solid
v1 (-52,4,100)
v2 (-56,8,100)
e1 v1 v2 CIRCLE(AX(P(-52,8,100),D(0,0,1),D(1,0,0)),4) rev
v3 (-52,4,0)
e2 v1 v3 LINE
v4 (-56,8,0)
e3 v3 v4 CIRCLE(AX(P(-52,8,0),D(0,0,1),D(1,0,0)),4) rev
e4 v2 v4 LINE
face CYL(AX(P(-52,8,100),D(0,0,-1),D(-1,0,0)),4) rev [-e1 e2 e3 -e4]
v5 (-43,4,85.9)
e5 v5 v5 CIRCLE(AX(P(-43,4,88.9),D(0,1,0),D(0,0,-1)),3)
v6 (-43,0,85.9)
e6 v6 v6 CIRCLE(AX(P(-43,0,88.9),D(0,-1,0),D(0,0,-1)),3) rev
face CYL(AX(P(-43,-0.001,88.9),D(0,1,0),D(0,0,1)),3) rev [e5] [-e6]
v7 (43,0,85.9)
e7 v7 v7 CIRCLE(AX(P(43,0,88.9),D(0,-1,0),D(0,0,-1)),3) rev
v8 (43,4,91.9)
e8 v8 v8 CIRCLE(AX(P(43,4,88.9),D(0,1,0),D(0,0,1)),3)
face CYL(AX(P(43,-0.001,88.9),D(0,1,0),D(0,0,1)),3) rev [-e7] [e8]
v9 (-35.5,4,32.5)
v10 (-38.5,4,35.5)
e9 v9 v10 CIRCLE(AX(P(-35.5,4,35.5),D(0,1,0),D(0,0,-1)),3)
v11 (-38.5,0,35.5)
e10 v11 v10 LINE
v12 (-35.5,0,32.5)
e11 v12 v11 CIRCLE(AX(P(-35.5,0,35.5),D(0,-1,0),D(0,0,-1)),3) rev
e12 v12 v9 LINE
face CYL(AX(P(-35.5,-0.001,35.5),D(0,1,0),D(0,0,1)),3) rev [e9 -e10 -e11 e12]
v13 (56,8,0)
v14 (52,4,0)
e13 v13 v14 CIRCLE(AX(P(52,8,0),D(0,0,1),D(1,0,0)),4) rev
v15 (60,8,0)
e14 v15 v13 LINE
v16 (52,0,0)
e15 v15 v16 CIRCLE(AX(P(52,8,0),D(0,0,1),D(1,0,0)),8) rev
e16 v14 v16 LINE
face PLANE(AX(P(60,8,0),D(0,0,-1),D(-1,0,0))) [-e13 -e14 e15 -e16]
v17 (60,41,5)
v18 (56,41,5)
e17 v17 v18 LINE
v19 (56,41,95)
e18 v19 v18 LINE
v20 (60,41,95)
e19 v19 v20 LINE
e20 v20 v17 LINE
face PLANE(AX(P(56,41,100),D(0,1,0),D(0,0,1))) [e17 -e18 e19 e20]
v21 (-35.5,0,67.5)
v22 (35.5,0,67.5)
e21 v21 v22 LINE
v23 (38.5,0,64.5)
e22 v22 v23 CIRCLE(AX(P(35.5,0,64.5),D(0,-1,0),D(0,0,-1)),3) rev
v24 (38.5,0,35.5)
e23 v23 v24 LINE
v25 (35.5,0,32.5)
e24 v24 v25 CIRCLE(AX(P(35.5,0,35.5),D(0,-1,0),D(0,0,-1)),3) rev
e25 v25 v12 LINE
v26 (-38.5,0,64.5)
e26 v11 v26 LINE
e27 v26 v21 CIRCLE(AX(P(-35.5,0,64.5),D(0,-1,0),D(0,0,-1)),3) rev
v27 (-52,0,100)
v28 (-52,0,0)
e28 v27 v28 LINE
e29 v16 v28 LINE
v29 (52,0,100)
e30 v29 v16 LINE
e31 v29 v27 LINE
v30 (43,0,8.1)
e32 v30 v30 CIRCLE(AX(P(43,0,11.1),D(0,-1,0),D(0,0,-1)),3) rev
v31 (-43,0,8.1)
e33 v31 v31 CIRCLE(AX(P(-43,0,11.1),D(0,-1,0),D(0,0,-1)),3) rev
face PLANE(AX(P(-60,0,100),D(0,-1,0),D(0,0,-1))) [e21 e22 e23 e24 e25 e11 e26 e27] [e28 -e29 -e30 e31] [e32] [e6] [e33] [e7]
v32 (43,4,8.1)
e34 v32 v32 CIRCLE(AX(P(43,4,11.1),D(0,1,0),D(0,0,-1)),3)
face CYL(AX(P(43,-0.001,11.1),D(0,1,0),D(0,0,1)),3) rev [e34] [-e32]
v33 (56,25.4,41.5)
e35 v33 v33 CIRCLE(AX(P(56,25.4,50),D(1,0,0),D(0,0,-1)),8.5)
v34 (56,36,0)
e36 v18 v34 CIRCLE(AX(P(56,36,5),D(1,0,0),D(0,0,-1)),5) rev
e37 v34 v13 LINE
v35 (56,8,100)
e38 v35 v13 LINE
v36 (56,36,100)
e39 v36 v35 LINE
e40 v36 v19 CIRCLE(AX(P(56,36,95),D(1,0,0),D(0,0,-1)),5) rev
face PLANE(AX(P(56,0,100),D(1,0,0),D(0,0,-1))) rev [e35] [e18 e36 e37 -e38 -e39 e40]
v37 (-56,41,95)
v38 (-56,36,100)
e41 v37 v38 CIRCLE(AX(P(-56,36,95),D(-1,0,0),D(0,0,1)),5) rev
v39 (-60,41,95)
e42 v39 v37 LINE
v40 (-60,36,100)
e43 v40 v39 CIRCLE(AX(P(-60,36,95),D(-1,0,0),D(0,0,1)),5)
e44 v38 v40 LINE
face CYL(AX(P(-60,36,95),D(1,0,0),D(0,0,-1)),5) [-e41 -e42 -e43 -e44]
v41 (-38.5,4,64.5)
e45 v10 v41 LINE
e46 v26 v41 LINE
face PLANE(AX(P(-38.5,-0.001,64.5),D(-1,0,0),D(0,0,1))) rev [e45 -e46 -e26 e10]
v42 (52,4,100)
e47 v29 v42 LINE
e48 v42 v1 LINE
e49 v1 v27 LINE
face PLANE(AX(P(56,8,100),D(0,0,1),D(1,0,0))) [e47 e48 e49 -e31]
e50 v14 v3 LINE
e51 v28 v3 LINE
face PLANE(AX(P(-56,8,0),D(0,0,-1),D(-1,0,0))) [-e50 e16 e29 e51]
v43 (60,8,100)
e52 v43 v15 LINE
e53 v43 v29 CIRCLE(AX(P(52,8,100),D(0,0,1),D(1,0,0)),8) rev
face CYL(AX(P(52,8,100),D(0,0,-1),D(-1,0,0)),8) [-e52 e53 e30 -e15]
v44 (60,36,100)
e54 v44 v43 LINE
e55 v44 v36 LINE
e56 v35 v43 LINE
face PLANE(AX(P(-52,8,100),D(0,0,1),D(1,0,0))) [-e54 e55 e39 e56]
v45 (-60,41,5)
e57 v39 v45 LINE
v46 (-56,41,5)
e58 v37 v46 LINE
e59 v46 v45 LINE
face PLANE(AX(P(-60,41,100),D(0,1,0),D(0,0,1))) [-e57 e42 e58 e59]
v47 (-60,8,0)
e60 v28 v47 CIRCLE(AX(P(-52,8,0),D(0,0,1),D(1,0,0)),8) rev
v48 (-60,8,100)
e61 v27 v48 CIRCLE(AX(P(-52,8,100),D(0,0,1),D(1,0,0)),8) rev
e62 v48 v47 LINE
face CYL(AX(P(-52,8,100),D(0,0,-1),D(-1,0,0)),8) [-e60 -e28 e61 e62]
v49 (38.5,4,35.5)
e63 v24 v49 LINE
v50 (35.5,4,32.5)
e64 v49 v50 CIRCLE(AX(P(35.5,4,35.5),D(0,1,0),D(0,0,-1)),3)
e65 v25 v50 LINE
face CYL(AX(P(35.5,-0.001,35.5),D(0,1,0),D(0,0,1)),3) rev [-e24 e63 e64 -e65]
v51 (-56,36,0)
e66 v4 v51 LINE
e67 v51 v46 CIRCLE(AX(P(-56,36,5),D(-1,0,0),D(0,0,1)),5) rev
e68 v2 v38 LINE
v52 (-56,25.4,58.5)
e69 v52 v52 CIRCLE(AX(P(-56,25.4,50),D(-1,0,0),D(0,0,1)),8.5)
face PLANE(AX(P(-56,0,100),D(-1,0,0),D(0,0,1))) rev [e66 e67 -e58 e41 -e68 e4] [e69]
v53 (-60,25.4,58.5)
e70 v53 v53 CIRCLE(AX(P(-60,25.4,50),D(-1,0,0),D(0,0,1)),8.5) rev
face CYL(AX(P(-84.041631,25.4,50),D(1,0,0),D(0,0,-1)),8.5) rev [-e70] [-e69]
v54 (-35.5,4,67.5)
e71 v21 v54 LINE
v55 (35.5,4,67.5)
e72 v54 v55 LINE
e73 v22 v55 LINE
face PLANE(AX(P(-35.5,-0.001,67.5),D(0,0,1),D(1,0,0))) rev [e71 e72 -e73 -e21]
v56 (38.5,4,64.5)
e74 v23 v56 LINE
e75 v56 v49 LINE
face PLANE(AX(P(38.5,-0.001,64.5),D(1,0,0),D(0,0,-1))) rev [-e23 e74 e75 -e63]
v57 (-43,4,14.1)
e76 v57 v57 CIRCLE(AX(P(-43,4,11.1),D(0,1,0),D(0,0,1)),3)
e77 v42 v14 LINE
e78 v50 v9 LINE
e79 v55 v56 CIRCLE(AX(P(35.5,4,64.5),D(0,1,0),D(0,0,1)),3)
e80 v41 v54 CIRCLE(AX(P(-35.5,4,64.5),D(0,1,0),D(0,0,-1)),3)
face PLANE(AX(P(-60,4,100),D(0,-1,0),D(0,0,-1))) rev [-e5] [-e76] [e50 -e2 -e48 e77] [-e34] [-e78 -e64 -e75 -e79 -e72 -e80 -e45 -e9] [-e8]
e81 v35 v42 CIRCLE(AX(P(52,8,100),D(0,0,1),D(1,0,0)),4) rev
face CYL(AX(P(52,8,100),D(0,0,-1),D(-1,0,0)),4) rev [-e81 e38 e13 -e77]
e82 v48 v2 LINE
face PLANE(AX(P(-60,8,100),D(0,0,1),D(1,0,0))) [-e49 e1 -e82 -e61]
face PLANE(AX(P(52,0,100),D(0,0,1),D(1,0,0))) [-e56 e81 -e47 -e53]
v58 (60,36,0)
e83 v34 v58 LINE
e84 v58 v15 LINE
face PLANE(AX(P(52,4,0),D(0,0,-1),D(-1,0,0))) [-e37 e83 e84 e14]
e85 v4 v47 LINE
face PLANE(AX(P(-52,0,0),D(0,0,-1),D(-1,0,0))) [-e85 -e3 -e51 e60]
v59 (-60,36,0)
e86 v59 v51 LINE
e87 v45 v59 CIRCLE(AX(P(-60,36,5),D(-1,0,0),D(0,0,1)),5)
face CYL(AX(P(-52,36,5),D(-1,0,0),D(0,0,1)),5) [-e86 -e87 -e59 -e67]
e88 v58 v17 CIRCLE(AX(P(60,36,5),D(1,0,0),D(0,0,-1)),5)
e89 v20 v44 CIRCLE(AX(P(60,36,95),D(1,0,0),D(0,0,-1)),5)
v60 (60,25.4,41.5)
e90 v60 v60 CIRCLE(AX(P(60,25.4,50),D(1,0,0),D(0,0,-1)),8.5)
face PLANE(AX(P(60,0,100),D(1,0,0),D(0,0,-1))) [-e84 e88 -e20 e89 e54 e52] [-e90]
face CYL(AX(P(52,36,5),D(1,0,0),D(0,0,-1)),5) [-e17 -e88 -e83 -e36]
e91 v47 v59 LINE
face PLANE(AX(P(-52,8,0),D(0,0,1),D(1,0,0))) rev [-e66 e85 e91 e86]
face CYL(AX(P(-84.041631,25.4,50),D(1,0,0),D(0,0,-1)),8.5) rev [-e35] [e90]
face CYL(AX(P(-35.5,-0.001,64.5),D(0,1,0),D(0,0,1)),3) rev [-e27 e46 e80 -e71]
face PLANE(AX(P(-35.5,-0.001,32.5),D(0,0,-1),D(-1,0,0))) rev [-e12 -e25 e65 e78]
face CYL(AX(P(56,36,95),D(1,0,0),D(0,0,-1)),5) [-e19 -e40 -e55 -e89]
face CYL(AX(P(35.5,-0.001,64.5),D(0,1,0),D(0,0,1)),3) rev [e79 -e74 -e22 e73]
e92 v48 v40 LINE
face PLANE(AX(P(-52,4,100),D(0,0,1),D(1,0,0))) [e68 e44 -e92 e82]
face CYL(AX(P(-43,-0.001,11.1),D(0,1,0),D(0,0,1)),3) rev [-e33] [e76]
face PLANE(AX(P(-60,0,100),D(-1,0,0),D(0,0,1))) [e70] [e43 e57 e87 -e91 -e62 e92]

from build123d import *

# Parameters (mm, degrees)
BASE_FLANGE1_DEPTH = 100
CUT_EXTRUDE1_REACH = 163.496
SKETCH6_R          = 8.5
CUT_EXTRUDE2_REACH = 124.348
SKETCH7_R          = 3
FILLET1_R          = 5


# Sheet-metal steps are written as plain solids
with BuildPart() as part:
    # Sketch1 → Base-Flange1 (new body)
    with BuildSketch(Plane.XY):
        with BuildLine():
            Line((-60, 41), (-60, 8))
            ThreePointArc((-60, 8), (-57.656854249, 2.343145751), (-52, 0))
            Line((-52, 0), (52, 0))
            ThreePointArc((52, 0), (57.656854249, 2.343145751), (60, 8))
            Line((60, 8), (60, 41))
            Line((60, 41), (56, 41))
            Line((56, 41), (56, 8))
            ThreePointArc((56, 8), (54.828427125, 5.171572875), (52, 4))
            Line((52, 4), (-52, 4))
            ThreePointArc((-52, 4), (-54.828427125, 5.171572875), (-56, 8))
            Line((-56, 8), (-56, 41))
            Line((-56, 41), (-60, 41))
        make_face()
    extrude(amount=BASE_FLANGE1_DEPTH)

    # Cut-Extrude1: up to this face of the body (flat: up to its plane)
    cut_extrude1_end = Plane(part.part.faces().sort_by_distance((-60, 24.5, 50))[0])
    # Sketch6 → Cut-Extrude1 (cut, up to the picked face)
    with BuildSketch(Plane(origin=(60, 0, 0), x_dir=(0, 0, -1), z_dir=(1, 0, 0)), mode=Mode.PRIVATE) as cut_extrude1_sk1:
        with Locations((-50, 25.4)):
            Circle(SKETCH6_R)
    cut_extrude1_tool1 = split(extrude(cut_extrude1_sk1.sketch, amount=-CUT_EXTRUDE1_REACH, mode=Mode.PRIVATE), bisect_by=cut_extrude1_end, keep=Keep.BOTH, mode=Mode.PRIVATE)
    add(cut_extrude1_tool1.solids().sort_by(Axis((60, 25.4, 50), (-1, 0, 0)))[0], mode=Mode.SUBTRACT)

    # Sketch7 → Cut-Extrude2 (cut, up to next)
    with BuildSketch(Plane(origin=(0, 4, 0), x_dir=(1, 0, 0), z_dir=(0, 1, 0)), mode=Mode.PRIVATE) as cut_extrude2_sk1:
        with Locations(Location((-43, -11.1, 0), (0, 0, 270))):
            Circle(SKETCH7_R)
    cut_extrude2_tool1 = extrude(cut_extrude2_sk1.sketch, amount=-CUT_EXTRUDE2_REACH, mode=Mode.PRIVATE) & part.part
    # Sketch7 → Cut-Extrude2 (cut, up to next)
    with BuildSketch(Plane(origin=(0, 4, 0), x_dir=(1, 0, 0), z_dir=(0, 1, 0)), mode=Mode.PRIVATE) as cut_extrude2_sk2:
        with Locations(Location((43, -11.1, 0), (0, 0, 90))):
            Circle(SKETCH7_R)
    cut_extrude2_tool2 = extrude(cut_extrude2_sk2.sketch, amount=-CUT_EXTRUDE2_REACH, mode=Mode.PRIVATE) & part.part
    # Sketch7 → Cut-Extrude2 (cut, up to next)
    with BuildSketch(Plane(origin=(0, 4, 0), x_dir=(1, 0, 0), z_dir=(0, 1, 0)), mode=Mode.PRIVATE) as cut_extrude2_sk3:
        with Locations(Location((-43, -88.9, 0), (0, 0, 90))):
            Circle(SKETCH7_R)
    cut_extrude2_tool3 = extrude(cut_extrude2_sk3.sketch, amount=-CUT_EXTRUDE2_REACH, mode=Mode.PRIVATE) & part.part
    # Sketch7 → Cut-Extrude2 (cut, up to next)
    with BuildSketch(Plane(origin=(0, 4, 0), x_dir=(1, 0, 0), z_dir=(0, 1, 0)), mode=Mode.PRIVATE) as cut_extrude2_sk4:
        with Locations(Location((43, -88.9, 0), (0, 0, 270))):
            Circle(SKETCH7_R)
    cut_extrude2_tool4 = extrude(cut_extrude2_sk4.sketch, amount=-CUT_EXTRUDE2_REACH, mode=Mode.PRIVATE) & part.part
    # Sketch7 → Cut-Extrude2 (cut, up to next)
    with BuildSketch(Plane(origin=(0, 4, 0), x_dir=(1, 0, 0), z_dir=(0, 1, 0)), mode=Mode.PRIVATE) as cut_extrude2_sk5:
        with BuildLine():
            Line((-35.5, -67.5), (35.5, -67.5))
            ThreePointArc((35.5, -67.5), (37.621320344, -66.621320344), (38.5, -64.5))
            Line((38.5, -64.5), (38.5, -35.5))
            ThreePointArc((38.5, -35.5), (37.621320344, -33.378679656), (35.5, -32.5))
            Line((35.5, -32.5), (-35.5, -32.5))
            ThreePointArc((-35.5, -32.5), (-37.621320344, -33.378679656), (-38.5, -35.5))
            Line((-38.5, -35.5), (-38.5, -64.5))
            ThreePointArc((-38.5, -64.5), (-37.621320344, -66.621320344), (-35.5, -67.5))
        make_face()
    cut_extrude2_tool5 = extrude(cut_extrude2_sk5.sketch, amount=-CUT_EXTRUDE2_REACH, mode=Mode.PRIVATE) & part.part
    add(cut_extrude2_tool1.solids().sort_by_distance((-43, 4, 11.1))[0], mode=Mode.SUBTRACT)
    add(cut_extrude2_tool2.solids().sort_by_distance((43, 4, 11.1))[0], mode=Mode.SUBTRACT)
    add(cut_extrude2_tool3.solids().sort_by_distance((-43, 4, 88.9))[0], mode=Mode.SUBTRACT)
    add(cut_extrude2_tool4.solids().sort_by_distance((43, 4, 88.9))[0], mode=Mode.SUBTRACT)
    add(cut_extrude2_tool5.solids().sort_by_distance((0, 4, 50))[0], mode=Mode.SUBTRACT)

    # Fillet1
    fillet1_edges = [part.edges().sort_by_distance(p)[0] for p in [
        (58, 41, 0),
        (-58, 41, 0),
        (58, 41, 100),
        (-58, 41, 100),
    ]]
    fillet(fillet1_edges, radius=FILLET1_R)


solid = part.part
